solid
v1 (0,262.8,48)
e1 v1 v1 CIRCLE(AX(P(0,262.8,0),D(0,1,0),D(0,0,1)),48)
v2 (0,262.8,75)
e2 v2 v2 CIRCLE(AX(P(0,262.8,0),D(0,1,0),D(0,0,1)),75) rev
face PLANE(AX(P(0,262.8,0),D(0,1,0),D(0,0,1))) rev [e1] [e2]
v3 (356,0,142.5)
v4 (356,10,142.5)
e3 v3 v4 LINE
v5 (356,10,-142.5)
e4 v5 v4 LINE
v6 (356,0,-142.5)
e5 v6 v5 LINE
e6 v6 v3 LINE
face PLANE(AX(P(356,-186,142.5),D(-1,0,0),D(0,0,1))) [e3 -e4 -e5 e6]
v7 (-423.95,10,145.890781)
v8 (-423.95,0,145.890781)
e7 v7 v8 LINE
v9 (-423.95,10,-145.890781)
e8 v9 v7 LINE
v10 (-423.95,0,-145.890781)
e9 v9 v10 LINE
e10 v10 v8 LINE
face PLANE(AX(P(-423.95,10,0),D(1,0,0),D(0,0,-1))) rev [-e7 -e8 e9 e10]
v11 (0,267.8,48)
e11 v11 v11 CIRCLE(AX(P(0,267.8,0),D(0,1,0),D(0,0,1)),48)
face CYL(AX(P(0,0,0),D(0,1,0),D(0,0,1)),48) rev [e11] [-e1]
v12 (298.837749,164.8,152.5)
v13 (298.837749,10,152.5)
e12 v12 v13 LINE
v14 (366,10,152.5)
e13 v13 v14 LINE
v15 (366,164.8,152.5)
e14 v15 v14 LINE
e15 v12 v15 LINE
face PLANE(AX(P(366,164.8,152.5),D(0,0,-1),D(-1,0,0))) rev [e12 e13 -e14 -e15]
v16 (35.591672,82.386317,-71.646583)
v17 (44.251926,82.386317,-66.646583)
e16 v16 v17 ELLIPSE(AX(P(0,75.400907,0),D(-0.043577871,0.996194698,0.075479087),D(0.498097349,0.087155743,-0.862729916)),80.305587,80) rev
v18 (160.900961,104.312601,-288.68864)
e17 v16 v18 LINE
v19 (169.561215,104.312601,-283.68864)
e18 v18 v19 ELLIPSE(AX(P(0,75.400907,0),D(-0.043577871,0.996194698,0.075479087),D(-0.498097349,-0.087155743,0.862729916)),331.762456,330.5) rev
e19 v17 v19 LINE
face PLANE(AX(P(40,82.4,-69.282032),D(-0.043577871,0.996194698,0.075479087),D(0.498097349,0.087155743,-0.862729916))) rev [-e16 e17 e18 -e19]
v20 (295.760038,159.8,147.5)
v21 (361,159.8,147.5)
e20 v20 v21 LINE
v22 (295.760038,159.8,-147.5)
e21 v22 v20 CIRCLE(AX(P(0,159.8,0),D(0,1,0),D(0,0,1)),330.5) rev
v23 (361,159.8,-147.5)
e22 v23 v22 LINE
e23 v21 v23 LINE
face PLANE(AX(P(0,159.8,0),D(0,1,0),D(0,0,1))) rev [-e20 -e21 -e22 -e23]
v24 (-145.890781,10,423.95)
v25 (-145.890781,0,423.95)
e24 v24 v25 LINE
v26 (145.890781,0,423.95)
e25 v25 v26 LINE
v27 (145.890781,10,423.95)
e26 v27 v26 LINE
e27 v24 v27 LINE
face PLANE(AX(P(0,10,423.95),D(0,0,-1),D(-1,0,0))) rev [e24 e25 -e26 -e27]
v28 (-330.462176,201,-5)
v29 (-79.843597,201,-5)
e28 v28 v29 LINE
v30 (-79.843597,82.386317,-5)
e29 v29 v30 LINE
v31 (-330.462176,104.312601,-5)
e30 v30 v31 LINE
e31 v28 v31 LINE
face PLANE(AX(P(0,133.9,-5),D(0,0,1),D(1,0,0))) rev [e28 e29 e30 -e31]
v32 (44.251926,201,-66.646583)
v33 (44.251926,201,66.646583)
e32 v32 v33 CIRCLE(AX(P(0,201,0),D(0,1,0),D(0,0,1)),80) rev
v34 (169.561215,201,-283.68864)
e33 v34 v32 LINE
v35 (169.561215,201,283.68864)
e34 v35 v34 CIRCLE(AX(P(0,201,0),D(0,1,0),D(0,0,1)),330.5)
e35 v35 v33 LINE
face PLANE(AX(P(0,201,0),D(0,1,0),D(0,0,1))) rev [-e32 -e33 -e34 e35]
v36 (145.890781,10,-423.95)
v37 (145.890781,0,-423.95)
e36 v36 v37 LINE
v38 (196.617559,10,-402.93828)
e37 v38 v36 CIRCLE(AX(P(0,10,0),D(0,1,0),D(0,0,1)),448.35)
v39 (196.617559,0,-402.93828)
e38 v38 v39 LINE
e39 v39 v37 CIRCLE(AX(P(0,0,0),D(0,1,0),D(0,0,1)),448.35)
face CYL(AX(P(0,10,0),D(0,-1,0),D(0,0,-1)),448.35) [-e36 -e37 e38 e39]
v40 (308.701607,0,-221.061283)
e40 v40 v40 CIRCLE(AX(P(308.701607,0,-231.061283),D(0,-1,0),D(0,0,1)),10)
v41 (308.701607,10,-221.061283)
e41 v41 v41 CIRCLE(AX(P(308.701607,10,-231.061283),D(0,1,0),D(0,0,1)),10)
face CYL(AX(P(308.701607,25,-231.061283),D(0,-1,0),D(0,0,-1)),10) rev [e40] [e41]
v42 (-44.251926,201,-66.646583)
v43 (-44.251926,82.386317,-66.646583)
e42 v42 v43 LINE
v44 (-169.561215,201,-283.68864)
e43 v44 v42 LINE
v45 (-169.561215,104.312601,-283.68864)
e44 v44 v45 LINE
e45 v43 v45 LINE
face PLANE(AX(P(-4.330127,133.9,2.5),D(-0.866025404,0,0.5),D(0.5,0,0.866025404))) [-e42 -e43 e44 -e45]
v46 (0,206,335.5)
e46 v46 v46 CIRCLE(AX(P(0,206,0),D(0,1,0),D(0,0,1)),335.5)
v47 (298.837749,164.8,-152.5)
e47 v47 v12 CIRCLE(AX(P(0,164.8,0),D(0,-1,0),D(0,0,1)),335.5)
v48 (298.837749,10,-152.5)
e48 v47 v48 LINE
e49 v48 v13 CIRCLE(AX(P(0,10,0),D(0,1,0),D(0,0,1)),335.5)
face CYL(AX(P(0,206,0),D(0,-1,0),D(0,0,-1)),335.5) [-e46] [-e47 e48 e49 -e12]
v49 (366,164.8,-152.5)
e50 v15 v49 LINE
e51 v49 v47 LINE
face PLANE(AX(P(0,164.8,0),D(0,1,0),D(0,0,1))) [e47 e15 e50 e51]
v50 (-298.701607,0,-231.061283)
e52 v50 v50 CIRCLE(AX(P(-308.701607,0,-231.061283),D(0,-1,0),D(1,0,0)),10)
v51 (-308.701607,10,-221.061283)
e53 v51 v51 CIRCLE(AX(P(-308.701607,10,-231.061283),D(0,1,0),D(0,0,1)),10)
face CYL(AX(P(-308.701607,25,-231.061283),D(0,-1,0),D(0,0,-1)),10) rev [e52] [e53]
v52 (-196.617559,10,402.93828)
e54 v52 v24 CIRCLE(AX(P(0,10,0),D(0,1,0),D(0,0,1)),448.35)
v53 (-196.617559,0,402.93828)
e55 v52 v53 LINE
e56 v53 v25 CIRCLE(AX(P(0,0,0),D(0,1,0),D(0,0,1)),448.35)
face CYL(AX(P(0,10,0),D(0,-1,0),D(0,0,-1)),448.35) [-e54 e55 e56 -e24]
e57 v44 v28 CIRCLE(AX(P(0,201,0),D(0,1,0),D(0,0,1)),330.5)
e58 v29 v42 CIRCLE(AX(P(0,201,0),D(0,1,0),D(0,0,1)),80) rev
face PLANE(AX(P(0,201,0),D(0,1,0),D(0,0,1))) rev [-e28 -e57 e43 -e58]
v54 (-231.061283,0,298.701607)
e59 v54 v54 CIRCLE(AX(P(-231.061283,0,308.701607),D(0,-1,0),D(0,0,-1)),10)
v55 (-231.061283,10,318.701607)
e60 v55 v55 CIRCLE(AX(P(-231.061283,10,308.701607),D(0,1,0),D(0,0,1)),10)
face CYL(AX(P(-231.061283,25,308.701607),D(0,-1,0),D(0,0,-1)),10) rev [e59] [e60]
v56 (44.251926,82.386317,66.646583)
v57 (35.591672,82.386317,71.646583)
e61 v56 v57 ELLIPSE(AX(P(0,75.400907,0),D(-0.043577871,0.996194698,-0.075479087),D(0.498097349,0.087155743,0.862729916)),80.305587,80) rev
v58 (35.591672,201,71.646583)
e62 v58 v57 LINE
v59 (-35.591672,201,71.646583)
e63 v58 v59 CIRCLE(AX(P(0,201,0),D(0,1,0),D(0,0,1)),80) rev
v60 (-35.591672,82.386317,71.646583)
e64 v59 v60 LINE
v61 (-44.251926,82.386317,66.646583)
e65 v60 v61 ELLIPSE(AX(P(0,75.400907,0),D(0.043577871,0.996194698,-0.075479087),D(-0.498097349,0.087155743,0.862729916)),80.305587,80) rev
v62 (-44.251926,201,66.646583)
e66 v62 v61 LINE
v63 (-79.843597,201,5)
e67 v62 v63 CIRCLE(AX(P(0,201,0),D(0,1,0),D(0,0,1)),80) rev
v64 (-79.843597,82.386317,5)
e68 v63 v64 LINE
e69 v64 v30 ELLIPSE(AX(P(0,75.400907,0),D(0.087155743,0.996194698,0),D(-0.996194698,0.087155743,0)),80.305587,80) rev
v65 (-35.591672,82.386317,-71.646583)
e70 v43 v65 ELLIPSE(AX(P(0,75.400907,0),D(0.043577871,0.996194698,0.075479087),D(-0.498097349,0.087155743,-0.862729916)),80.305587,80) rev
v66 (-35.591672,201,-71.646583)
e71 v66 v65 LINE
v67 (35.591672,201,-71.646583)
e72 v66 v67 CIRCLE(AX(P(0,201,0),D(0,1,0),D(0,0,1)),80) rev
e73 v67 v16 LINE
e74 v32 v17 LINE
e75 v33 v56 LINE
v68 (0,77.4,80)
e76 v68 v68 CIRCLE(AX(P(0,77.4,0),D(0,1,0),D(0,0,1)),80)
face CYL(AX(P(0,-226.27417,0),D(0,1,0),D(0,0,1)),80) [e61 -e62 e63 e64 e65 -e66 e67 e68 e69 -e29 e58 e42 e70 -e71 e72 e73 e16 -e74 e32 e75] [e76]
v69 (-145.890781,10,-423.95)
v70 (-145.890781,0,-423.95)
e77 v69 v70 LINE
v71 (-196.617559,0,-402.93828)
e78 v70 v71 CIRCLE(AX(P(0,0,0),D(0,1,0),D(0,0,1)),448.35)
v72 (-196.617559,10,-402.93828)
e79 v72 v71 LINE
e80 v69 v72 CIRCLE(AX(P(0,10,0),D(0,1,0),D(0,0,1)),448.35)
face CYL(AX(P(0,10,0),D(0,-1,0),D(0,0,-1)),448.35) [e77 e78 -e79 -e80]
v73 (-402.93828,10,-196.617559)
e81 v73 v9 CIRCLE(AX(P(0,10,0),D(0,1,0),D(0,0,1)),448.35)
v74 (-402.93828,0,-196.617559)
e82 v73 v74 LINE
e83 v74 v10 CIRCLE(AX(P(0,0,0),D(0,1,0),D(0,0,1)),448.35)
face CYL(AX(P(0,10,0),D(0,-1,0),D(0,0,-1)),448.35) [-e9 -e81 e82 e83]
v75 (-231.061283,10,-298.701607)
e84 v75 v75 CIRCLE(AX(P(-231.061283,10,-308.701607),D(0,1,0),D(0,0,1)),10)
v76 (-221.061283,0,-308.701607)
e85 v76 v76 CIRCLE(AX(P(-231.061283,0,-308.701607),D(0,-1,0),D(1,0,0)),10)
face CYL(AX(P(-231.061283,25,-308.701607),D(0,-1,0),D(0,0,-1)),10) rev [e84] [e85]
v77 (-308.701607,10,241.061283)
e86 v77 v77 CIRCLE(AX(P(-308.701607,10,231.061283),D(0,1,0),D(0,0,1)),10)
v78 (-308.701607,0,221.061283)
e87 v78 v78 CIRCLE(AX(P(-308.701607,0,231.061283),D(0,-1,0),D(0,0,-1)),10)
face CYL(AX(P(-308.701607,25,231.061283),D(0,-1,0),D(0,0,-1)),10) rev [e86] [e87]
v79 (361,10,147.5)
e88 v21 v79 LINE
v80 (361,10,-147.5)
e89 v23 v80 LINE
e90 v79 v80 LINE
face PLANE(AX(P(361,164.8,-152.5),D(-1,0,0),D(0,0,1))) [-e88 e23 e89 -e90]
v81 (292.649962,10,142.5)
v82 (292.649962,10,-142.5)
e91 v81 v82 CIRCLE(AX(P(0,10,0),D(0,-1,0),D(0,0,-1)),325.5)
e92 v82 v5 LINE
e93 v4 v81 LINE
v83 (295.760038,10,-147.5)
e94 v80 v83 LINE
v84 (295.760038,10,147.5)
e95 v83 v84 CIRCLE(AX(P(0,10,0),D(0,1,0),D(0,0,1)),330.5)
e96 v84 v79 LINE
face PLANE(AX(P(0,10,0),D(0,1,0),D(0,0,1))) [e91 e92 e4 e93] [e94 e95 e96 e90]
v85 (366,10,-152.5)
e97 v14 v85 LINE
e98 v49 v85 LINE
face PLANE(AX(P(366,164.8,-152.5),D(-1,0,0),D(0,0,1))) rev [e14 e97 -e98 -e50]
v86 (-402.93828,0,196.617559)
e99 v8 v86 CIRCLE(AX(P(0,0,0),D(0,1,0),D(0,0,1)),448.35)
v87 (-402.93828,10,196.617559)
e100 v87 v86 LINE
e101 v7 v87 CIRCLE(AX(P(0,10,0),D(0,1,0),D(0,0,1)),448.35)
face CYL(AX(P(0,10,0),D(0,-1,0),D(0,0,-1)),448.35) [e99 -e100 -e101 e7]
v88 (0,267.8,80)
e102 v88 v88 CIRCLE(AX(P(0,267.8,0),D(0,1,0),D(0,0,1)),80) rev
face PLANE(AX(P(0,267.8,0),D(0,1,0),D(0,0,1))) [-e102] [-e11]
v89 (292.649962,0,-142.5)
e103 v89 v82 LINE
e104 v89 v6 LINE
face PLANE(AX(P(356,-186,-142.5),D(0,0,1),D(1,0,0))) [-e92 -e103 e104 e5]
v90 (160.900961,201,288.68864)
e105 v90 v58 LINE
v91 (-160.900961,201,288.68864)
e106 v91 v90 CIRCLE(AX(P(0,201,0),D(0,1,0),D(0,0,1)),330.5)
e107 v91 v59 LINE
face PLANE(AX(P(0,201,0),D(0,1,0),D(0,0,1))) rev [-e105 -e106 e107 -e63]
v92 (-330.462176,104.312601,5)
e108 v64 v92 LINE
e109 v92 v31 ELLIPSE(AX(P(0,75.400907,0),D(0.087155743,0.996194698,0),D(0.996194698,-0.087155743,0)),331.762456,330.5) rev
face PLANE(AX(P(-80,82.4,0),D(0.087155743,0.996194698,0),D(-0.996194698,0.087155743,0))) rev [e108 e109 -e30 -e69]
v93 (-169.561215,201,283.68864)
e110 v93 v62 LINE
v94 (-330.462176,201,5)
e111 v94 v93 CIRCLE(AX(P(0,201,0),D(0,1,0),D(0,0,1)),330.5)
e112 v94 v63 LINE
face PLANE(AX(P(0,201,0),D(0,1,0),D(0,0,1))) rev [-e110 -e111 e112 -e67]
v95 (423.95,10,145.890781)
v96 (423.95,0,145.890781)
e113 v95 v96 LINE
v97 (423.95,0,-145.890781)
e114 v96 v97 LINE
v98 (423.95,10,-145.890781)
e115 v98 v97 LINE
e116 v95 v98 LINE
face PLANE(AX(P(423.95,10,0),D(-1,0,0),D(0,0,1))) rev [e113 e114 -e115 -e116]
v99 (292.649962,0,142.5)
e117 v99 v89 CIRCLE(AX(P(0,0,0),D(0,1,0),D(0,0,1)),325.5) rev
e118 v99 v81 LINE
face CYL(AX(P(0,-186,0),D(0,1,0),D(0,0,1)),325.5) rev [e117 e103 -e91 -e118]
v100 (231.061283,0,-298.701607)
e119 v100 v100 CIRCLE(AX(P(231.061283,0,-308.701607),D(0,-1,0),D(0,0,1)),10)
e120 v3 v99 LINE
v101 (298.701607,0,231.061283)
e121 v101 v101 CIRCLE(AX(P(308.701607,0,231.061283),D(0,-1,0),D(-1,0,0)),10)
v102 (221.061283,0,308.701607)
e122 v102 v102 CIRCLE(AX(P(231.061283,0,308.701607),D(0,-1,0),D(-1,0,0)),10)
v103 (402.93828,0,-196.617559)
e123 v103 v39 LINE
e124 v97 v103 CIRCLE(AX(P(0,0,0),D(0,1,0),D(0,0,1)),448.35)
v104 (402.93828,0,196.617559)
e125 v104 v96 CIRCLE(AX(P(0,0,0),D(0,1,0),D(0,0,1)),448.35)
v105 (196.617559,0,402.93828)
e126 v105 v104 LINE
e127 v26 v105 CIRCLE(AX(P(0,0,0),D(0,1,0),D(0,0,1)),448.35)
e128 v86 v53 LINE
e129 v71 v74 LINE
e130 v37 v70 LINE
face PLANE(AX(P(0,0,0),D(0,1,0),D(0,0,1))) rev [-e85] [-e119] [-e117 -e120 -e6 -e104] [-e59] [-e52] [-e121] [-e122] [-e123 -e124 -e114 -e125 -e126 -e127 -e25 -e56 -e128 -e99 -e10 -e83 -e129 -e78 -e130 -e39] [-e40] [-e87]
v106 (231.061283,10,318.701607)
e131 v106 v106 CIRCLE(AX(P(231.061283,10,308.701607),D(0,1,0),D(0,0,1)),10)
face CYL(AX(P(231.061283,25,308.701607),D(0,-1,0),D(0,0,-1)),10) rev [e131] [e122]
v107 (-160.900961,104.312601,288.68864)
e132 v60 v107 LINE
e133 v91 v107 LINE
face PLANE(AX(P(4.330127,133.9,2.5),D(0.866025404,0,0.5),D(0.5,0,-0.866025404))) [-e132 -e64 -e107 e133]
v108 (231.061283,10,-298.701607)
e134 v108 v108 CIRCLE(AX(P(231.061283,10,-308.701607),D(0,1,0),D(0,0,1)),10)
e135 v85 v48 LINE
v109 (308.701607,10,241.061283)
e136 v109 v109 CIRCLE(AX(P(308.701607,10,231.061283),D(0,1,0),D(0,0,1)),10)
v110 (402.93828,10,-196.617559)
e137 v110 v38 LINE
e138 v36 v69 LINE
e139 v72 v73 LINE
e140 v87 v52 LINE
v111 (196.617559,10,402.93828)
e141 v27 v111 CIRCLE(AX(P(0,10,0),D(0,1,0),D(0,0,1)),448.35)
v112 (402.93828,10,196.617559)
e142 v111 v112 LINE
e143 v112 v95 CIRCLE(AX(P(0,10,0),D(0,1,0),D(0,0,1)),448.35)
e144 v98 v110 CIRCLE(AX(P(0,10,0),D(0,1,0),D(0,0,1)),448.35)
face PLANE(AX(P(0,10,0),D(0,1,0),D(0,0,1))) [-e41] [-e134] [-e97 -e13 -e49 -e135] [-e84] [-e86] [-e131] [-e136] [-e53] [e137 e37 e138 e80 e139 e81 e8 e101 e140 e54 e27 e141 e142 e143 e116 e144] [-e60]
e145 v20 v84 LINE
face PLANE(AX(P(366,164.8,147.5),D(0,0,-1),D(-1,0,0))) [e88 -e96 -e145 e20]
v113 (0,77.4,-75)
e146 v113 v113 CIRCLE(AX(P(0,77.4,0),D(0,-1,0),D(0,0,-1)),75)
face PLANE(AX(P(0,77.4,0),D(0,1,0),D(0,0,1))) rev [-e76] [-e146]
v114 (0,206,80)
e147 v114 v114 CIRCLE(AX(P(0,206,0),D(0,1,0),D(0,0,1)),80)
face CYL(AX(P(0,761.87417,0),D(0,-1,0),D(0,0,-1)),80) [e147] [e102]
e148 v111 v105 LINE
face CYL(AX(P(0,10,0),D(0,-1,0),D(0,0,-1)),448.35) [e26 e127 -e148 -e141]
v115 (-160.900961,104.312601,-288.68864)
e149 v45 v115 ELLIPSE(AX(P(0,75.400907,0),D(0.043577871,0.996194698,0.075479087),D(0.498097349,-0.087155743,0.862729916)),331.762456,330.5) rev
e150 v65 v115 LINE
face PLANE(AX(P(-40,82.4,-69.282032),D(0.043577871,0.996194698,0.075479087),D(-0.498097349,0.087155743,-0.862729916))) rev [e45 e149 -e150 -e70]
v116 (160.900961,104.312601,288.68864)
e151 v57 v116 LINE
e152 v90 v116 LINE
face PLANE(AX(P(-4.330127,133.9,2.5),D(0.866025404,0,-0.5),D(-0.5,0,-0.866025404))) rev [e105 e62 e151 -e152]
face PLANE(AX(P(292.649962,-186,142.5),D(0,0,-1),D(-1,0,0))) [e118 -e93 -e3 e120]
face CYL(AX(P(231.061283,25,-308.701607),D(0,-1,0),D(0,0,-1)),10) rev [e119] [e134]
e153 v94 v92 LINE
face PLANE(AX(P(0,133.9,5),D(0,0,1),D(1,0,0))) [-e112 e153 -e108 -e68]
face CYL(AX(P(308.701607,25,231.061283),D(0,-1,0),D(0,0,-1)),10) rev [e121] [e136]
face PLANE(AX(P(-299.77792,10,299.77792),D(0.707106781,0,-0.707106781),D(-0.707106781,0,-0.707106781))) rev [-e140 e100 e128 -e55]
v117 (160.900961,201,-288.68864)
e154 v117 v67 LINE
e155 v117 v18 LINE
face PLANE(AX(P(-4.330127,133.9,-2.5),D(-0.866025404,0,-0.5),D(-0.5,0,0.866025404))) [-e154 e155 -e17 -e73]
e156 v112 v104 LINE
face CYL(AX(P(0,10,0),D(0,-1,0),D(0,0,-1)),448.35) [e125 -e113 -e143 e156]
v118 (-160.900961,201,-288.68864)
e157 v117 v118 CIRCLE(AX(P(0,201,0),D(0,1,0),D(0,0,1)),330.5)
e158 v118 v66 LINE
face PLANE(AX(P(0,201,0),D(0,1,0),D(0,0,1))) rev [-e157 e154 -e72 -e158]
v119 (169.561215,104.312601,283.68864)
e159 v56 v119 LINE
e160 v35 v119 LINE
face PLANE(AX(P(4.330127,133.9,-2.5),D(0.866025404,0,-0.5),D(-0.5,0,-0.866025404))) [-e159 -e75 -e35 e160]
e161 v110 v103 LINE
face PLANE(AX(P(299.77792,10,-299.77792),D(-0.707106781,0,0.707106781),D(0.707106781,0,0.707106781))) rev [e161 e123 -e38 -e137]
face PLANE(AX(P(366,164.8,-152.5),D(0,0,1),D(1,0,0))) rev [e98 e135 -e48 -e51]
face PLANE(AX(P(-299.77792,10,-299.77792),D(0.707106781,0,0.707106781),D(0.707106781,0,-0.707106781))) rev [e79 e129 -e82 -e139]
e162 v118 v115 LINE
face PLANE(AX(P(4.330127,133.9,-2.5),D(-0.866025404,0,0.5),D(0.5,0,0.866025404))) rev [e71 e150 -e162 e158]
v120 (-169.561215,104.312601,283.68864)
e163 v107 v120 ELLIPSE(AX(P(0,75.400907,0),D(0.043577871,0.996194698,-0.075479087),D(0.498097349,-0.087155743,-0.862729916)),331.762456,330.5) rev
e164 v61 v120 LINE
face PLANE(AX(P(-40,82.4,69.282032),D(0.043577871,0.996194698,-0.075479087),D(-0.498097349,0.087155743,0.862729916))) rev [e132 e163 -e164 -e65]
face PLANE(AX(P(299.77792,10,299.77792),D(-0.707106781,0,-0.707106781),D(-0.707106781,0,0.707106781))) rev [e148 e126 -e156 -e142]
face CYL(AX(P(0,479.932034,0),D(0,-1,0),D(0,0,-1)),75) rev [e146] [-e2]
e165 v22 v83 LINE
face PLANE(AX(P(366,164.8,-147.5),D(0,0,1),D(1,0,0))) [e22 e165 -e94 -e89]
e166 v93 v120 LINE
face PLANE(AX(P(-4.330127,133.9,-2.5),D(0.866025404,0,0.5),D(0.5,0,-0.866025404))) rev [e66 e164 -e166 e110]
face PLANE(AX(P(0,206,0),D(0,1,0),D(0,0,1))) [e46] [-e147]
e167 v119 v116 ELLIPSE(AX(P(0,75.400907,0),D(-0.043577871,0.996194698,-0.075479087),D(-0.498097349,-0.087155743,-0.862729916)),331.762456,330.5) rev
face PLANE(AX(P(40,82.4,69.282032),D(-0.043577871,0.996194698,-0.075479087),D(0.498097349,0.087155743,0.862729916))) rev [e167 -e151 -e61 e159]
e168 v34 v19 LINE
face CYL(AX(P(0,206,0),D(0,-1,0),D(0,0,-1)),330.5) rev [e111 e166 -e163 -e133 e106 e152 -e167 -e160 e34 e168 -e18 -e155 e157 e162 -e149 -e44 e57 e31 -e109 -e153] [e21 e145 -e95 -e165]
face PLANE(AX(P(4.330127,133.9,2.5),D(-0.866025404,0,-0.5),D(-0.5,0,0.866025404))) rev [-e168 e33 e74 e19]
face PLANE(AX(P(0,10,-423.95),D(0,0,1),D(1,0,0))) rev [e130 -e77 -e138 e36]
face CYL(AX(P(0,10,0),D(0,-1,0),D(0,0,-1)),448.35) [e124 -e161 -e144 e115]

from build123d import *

# Parameters (mm, degrees)
EXTRUDE_1_DEPTH          = 10
SKETCH_2_R               = 335.5
EXTRUDE_2_DEPTH          = 196
EXTRUDE_4_DEPTH          = 154.8
SHELL_START              = 10
SHELL_4_OUTLINE_R        = 330.5
SHELL_4_DEPTH            = 191
SHELL_4_2_DEPTH          = 149.8
CUT_EXTRUDE_2_DEPTH      = 196
SKETCH_6_R               = 80
EXTRUDE_6_DEPTH          = 66.8
SKETCH_6_2_R             = 80
EXTRUDE_7_DEPTH          = 123.6
SKETCH_7_R               = 75
CUT_EXTRUDE_3_DEPTH      = 185.4
SKETCH_9_R               = 10
CUT_EXTRUDE_11_DEPTH     = 25
PATTERN_CIRCULAR_1_COUNT = 4
RIB_START                = -5
RIB_1_DEPTH              = 10
PATTERN_CIRCULAR_3_COUNT = 6
SKETCH_13_R              = 48
CUT_EXTRUDE_12_DEPTH     = 657.646057629


# Read off the part's stored shape, not the designer's step: 抽壳4, 筋1
with BuildPart() as part:
    # 草图1 → 凸台-拉伸1 (new body)
    with BuildSketch(Plane(origin=(0, 0, 0), x_dir=(1, 0, 0), z_dir=(0, 1, 0))):
        with BuildLine():
            ThreePointArc((-145.890781066, 423.95), (-171.576116901, 414.221388401), (-196.61755928, 402.938280488))
            Line((-196.61755928, 402.938280488), (-402.938280488, 196.61755928))
            ThreePointArc((-402.938280488, 196.61755928), (-414.221388401, 171.576116901), (-423.95, 145.890781066))
            Line((-423.95, 145.890781066), (-423.95, -145.890781066))
            ThreePointArc((-423.95, -145.890781066), (-414.221388401, -171.576116901), (-402.938280488, -196.61755928))
            Line((-402.938280488, -196.61755928), (-196.61755928, -402.938280488))
            ThreePointArc((-196.61755928, -402.938280488), (-171.576116901, -414.221388401), (-145.890781066, -423.95))
            Line((-145.890781066, -423.95), (145.890781066, -423.95))
            ThreePointArc((145.890781066, -423.95), (171.576116901, -414.221388401), (196.61755928, -402.938280488))
            Line((196.61755928, -402.938280488), (402.938280488, -196.61755928))
            ThreePointArc((402.938280488, -196.61755928), (414.221388401, -171.576116901), (423.95, -145.890781066))
            Line((423.95, -145.890781066), (423.95, 145.890781066))
            ThreePointArc((423.95, 145.890781066), (414.221388401, 171.576116901), (402.938280488, 196.61755928))
            Line((402.938280488, 196.61755928), (196.61755928, 402.938280488))
            ThreePointArc((196.61755928, 402.938280488), (171.576116901, 414.221388401), (145.890781066, 423.95))
            Line((145.890781066, 423.95), (-145.890781066, 423.95))
        make_face()
    extrude(amount=EXTRUDE_1_DEPTH)

    # 草图5 → 切除-拉伸2 (cut)
    with BuildSketch(Plane.XZ.offset(-10)):
        with BuildLine():
            Line((356, -142.5), (292.649961558, -142.5))
            ThreePointArc((292.649961558, -142.5), (-325.5, 0), (292.649961558, 142.5))
            Line((292.649961558, 142.5), (356, 142.5))
            Line((356, 142.5), (356, -142.5))
        make_face()
    extrude(amount=CUT_EXTRUDE_2_DEPTH, mode=Mode.SUBTRACT)


with BuildPart() as body_2:
    # 草图2 → 凸台-拉伸2 (new body)
    with BuildSketch(Plane(origin=(0, 10, 0), x_dir=(1, 0, 0), z_dir=(0, 1, 0))):
        with Locations(Location((0, 0, 0), (0, 0, 270))):
            Circle(SKETCH_2_R)
    extrude(amount=EXTRUDE_2_DEPTH)


with BuildPart() as body_3:
    # 草图3 → 凸台-拉伸4 (new body)
    with BuildSketch(Plane(origin=(0, 10, 0), x_dir=(1, 0, 0), z_dir=(0, 1, 0))):
        with BuildLine():
            Line((366, 152.5), (366, -152.5))
            Line((366, -152.5), (298.83774862, -152.5))
            ThreePointArc((298.83774862, -152.5), (335.5, 0), (298.83774862, 152.5))
            Line((298.83774862, 152.5), (366, 152.5))
        make_face()
    extrude(amount=EXTRUDE_4_DEPTH)


with BuildPart() as body_2_1:
    add(body_2.part)

    # Combine 1: union body 3
    add(body_3.part)

    # 抽壳4 outline → 抽壳4 (cut)
    with BuildSketch(Plane(origin=(0, 0, 0), x_dir=(1, 0, 0), z_dir=(0, 1, 0)).offset(SHELL_START)):
        Circle(SHELL_4_OUTLINE_R)
    extrude(amount=SHELL_4_DEPTH, mode=Mode.SUBTRACT)

    # Shell 4 2 outline → Shell 4 2 (cut)
    with BuildSketch(Plane(origin=(0, 0, 0), x_dir=(1, 0, 0), z_dir=(0, 1, 0)).offset(SHELL_START)):
        with BuildLine():
            ThreePointArc((295.760037869, 147.5), (330.5, 0), (295.760037869, -147.5))
            Line((295.760037869, -147.5), (361, -147.5))
            Line((361, -147.5), (361, 147.5))
            Line((361, 147.5), (295.760037869, 147.5))
        make_face()
    extrude(amount=SHELL_4_2_DEPTH, mode=Mode.SUBTRACT)

    # Combine 2: union part
    add(part.part)

    # 草图6 → 凸台-拉伸6 (add)
    with BuildSketch(Plane.XZ.offset(-201)):
        with Locations(Location((0, 0, 0), (0, 0, 90))):
            Circle(SKETCH_6_R)
    extrude(amount=-EXTRUDE_6_DEPTH)

    # 草图6<2> → 凸台-拉伸7 (add)
    with BuildSketch(Plane.XZ.offset(-201)):
        with Locations(Location((0, 0, 0), (0, 0, 90))):
            Circle(SKETCH_6_2_R)
    extrude(amount=EXTRUDE_7_DEPTH)

    # 草图7 → 切除-拉伸3 (cut)
    with BuildSketch(Plane.XZ.offset(-77.4)):
        with Locations(Location((0, 0, 0), (0, 0, 270))):
            Circle(SKETCH_7_R)
    extrude(amount=-CUT_EXTRUDE_3_DEPTH, mode=Mode.SUBTRACT)

    # 草图9 → 切除-拉伸11 (cut)
    with BuildSketch(Plane.XZ):
        with Locations(Location((-308.701607463, 231.061282888, 0), (0, 0, 270))):
            Circle(SKETCH_9_R)
        with Locations(Location((-231.061282888, 308.701607463, 0), (0, 0, 270))):
            Circle(SKETCH_9_R)
    cut_extrude_11 = extrude(amount=-CUT_EXTRUDE_11_DEPTH, mode=Mode.SUBTRACT)

    # 阵列(圆周)1: 切除-拉伸11 ×4 about axis
    pattern_circular_1_axis = Axis((0, 0, 0), (0, 1, 0))
    for i in range(1, PATTERN_CIRCULAR_1_COUNT):
        add(cut_extrude_11.rotate(pattern_circular_1_axis, i * 360 / PATTERN_CIRCULAR_1_COUNT), mode=Mode.SUBTRACT)

    # 筋1 outline → 筋1 (add)
    with BuildSketch(Plane.XY.offset(RIB_START)):
        Polygon((-330.5, 104.315910213), (-79.843597113, 82.38631652), (-78, 82.225022673), (-78, 201), (-332, 201), (-332, 104.447143208), align=None)
    rib_1 = extrude(amount=RIB_1_DEPTH)

    # 阵列(圆周)3: 筋1 ×6 about axis, 1 skipped
    pattern_circular_3_axis = Axis((0, 0, 0), (0, 1, 0))
    add([rib_1.rotate(pattern_circular_3_axis, i * 360 / PATTERN_CIRCULAR_3_COUNT) for i in range(1, PATTERN_CIRCULAR_3_COUNT) if i not in (3,)])

    # 草图13 → 切除-拉伸12 (cut, through all)
    with BuildSketch(Plane(origin=(0, 267.8, 0), x_dir=(1, 0, 0), z_dir=(0, 1, 0))):
        with Locations(Location((0, 0, 0), (0, 0, 270))):
            Circle(SKETCH_13_R)
    extrude(amount=-CUT_EXTRUDE_12_DEPTH, mode=Mode.SUBTRACT)


solid = body_2_1.part
